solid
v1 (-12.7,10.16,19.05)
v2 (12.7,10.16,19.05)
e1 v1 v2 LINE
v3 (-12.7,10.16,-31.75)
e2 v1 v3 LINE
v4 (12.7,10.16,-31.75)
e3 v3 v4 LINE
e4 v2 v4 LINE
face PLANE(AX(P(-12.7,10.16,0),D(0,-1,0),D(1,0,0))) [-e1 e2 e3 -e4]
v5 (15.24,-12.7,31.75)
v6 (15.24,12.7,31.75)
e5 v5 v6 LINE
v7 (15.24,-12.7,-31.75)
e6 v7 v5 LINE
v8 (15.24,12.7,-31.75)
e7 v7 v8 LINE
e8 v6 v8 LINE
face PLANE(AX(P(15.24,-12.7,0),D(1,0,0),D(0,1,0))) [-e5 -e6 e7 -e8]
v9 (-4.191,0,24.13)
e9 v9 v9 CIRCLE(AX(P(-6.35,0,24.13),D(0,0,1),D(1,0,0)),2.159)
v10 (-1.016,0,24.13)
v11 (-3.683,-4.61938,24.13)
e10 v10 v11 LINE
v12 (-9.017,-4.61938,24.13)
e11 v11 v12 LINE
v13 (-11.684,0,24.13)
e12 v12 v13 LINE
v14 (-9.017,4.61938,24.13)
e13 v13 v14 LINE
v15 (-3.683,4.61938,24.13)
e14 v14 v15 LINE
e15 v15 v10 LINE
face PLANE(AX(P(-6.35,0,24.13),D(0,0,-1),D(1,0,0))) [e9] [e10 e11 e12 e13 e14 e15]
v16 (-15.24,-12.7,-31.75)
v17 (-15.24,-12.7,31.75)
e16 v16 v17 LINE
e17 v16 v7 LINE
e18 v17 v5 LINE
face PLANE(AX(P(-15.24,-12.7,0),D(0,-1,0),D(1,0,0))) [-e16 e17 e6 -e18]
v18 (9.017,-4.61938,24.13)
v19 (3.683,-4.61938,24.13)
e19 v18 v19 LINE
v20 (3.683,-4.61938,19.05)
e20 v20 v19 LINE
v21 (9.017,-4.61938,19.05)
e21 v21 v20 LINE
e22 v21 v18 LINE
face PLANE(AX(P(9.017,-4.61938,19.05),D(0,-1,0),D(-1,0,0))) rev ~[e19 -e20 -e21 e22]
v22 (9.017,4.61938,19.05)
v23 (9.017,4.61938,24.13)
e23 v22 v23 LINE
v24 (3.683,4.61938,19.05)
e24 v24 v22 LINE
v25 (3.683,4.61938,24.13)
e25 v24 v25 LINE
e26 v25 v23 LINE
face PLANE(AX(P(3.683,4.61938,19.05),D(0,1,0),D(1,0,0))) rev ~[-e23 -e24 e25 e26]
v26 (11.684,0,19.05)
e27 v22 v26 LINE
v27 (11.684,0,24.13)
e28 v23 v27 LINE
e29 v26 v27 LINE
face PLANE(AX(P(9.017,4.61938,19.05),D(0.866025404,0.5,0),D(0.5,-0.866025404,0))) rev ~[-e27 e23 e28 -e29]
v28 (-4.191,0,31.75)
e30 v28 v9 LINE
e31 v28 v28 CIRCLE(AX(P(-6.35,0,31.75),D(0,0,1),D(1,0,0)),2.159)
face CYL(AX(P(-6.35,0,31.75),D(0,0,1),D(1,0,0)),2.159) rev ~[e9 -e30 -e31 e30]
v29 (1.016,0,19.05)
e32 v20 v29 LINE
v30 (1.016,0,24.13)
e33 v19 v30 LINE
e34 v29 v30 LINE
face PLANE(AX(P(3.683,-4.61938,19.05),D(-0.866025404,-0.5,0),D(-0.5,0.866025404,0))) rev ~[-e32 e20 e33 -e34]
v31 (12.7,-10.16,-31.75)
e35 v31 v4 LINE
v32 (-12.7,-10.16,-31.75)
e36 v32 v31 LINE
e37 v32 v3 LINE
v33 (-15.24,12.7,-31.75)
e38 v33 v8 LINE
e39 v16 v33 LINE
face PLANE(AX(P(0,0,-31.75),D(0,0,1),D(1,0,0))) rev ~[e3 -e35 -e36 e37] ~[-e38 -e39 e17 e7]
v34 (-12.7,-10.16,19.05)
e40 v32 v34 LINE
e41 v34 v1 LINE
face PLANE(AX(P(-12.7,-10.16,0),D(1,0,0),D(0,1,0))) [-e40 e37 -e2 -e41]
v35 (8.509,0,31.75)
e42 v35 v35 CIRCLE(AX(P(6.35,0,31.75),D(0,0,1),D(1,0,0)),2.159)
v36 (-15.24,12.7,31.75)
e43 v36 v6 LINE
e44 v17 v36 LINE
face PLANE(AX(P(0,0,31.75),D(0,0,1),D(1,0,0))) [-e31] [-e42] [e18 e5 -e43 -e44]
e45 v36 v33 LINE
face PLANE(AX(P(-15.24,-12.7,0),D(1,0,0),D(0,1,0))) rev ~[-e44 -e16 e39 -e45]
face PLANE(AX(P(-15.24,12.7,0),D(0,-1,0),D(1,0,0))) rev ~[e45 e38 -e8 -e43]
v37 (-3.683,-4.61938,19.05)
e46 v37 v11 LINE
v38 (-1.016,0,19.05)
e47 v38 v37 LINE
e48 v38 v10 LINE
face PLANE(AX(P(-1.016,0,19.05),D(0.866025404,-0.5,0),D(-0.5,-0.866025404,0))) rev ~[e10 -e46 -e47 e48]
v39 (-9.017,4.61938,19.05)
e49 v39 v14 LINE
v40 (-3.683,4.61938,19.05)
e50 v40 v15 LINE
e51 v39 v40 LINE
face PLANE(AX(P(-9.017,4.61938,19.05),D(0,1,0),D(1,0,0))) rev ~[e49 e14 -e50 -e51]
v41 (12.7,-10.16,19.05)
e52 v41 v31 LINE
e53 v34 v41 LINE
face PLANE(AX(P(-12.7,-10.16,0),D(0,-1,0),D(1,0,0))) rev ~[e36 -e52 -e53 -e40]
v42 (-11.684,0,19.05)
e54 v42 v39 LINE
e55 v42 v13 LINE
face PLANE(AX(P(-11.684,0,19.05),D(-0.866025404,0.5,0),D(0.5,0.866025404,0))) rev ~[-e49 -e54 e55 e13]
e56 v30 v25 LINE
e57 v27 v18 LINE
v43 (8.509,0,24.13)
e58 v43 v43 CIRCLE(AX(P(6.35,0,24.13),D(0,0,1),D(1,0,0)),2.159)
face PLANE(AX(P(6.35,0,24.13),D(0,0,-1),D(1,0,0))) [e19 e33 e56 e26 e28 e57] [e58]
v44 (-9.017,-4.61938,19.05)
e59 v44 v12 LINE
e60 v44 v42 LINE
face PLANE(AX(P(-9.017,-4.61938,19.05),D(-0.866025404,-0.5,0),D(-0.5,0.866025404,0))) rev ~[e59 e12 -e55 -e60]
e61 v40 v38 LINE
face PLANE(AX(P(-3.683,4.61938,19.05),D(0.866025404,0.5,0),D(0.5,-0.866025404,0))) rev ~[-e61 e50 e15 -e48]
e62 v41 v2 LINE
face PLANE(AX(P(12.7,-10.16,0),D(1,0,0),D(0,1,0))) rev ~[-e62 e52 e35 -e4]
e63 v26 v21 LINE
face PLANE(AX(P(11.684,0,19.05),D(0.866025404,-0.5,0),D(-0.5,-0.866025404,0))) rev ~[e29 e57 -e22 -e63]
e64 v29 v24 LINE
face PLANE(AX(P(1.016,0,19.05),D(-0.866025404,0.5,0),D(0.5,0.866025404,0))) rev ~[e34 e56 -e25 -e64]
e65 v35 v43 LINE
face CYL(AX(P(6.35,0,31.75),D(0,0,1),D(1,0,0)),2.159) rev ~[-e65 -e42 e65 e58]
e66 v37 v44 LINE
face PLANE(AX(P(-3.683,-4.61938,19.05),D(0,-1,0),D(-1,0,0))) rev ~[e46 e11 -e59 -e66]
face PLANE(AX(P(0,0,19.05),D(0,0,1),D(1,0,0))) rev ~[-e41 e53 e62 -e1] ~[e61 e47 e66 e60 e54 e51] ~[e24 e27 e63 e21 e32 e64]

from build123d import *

# Parameters (mm, degrees)
F0_W     = 30.48
F0_H     = 25.4
F0_W_2   = 25.4
F0_H_2   = 20.32
F1_DEPTH = 31.75
F2_W     = 25.4
F2_H     = 20.32
F2_W_2   = 20.32
F2_H_2   = 15.24
F2_R     = 2.159
F3_DEPTH = 12.7
F4_R     = 2.159
F5_DEPTH = 5.08


with BuildPart() as f1:
    # F0 (on Top) → F1 (new body, symmetric)
    with BuildSketch(Plane.XY):
        Rectangle(F0_W, F0_H)
        Rectangle(F0_W_2, F0_H_2, mode=Mode.SUBTRACT)
    extrude(amount=F1_DEPTH, both=True)

    # F2 (on face) → F3 (join)
    with BuildSketch(Plane.XY.offset(31.75)):
        Rectangle(F2_W, F2_H)
        Rectangle(F2_W_2, F2_H_2, mode=Mode.SUBTRACT)
        Rectangle(F2_W_2, F2_H_2)
        with Locations((-6.35, 0)):
            Circle(F2_R, mode=Mode.SUBTRACT)
        with Locations((6.35, 0)):
            Circle(F2_R, mode=Mode.SUBTRACT)
    extrude(amount=-F3_DEPTH)

    # F4 (on face) → F5 (cut)
    with BuildSketch(Plane(origin=(0, 0, 19.05), x_dir=(1, 0, 0), z_dir=(0, 0, -1))):
        Polygon((-3.683, 4.6193795038), (-9.017, 4.6193795038), (-11.684, 0), (-9.017, -4.6193795038), (-3.683, -4.6193795038), (-1.016, 0), align=None)
        with Locations((-6.35, 0)):
            Circle(F4_R, mode=Mode.SUBTRACT)
        Polygon((9.017, 4.6193795038), (3.683, 4.6193795038), (1.016, 0), (3.683, -4.6193795038), (9.017, -4.6193795038), (11.684, 0), align=None)
        with Locations((6.35, 0)):
            Circle(F4_R, mode=Mode.SUBTRACT)
        with Locations((-6.35, 0)):
            Circle(F4_R)
        with Locations((6.35, 0)):
            Circle(F4_R)
    extrude(amount=-F5_DEPTH, mode=Mode.SUBTRACT)


solid = f1.part
